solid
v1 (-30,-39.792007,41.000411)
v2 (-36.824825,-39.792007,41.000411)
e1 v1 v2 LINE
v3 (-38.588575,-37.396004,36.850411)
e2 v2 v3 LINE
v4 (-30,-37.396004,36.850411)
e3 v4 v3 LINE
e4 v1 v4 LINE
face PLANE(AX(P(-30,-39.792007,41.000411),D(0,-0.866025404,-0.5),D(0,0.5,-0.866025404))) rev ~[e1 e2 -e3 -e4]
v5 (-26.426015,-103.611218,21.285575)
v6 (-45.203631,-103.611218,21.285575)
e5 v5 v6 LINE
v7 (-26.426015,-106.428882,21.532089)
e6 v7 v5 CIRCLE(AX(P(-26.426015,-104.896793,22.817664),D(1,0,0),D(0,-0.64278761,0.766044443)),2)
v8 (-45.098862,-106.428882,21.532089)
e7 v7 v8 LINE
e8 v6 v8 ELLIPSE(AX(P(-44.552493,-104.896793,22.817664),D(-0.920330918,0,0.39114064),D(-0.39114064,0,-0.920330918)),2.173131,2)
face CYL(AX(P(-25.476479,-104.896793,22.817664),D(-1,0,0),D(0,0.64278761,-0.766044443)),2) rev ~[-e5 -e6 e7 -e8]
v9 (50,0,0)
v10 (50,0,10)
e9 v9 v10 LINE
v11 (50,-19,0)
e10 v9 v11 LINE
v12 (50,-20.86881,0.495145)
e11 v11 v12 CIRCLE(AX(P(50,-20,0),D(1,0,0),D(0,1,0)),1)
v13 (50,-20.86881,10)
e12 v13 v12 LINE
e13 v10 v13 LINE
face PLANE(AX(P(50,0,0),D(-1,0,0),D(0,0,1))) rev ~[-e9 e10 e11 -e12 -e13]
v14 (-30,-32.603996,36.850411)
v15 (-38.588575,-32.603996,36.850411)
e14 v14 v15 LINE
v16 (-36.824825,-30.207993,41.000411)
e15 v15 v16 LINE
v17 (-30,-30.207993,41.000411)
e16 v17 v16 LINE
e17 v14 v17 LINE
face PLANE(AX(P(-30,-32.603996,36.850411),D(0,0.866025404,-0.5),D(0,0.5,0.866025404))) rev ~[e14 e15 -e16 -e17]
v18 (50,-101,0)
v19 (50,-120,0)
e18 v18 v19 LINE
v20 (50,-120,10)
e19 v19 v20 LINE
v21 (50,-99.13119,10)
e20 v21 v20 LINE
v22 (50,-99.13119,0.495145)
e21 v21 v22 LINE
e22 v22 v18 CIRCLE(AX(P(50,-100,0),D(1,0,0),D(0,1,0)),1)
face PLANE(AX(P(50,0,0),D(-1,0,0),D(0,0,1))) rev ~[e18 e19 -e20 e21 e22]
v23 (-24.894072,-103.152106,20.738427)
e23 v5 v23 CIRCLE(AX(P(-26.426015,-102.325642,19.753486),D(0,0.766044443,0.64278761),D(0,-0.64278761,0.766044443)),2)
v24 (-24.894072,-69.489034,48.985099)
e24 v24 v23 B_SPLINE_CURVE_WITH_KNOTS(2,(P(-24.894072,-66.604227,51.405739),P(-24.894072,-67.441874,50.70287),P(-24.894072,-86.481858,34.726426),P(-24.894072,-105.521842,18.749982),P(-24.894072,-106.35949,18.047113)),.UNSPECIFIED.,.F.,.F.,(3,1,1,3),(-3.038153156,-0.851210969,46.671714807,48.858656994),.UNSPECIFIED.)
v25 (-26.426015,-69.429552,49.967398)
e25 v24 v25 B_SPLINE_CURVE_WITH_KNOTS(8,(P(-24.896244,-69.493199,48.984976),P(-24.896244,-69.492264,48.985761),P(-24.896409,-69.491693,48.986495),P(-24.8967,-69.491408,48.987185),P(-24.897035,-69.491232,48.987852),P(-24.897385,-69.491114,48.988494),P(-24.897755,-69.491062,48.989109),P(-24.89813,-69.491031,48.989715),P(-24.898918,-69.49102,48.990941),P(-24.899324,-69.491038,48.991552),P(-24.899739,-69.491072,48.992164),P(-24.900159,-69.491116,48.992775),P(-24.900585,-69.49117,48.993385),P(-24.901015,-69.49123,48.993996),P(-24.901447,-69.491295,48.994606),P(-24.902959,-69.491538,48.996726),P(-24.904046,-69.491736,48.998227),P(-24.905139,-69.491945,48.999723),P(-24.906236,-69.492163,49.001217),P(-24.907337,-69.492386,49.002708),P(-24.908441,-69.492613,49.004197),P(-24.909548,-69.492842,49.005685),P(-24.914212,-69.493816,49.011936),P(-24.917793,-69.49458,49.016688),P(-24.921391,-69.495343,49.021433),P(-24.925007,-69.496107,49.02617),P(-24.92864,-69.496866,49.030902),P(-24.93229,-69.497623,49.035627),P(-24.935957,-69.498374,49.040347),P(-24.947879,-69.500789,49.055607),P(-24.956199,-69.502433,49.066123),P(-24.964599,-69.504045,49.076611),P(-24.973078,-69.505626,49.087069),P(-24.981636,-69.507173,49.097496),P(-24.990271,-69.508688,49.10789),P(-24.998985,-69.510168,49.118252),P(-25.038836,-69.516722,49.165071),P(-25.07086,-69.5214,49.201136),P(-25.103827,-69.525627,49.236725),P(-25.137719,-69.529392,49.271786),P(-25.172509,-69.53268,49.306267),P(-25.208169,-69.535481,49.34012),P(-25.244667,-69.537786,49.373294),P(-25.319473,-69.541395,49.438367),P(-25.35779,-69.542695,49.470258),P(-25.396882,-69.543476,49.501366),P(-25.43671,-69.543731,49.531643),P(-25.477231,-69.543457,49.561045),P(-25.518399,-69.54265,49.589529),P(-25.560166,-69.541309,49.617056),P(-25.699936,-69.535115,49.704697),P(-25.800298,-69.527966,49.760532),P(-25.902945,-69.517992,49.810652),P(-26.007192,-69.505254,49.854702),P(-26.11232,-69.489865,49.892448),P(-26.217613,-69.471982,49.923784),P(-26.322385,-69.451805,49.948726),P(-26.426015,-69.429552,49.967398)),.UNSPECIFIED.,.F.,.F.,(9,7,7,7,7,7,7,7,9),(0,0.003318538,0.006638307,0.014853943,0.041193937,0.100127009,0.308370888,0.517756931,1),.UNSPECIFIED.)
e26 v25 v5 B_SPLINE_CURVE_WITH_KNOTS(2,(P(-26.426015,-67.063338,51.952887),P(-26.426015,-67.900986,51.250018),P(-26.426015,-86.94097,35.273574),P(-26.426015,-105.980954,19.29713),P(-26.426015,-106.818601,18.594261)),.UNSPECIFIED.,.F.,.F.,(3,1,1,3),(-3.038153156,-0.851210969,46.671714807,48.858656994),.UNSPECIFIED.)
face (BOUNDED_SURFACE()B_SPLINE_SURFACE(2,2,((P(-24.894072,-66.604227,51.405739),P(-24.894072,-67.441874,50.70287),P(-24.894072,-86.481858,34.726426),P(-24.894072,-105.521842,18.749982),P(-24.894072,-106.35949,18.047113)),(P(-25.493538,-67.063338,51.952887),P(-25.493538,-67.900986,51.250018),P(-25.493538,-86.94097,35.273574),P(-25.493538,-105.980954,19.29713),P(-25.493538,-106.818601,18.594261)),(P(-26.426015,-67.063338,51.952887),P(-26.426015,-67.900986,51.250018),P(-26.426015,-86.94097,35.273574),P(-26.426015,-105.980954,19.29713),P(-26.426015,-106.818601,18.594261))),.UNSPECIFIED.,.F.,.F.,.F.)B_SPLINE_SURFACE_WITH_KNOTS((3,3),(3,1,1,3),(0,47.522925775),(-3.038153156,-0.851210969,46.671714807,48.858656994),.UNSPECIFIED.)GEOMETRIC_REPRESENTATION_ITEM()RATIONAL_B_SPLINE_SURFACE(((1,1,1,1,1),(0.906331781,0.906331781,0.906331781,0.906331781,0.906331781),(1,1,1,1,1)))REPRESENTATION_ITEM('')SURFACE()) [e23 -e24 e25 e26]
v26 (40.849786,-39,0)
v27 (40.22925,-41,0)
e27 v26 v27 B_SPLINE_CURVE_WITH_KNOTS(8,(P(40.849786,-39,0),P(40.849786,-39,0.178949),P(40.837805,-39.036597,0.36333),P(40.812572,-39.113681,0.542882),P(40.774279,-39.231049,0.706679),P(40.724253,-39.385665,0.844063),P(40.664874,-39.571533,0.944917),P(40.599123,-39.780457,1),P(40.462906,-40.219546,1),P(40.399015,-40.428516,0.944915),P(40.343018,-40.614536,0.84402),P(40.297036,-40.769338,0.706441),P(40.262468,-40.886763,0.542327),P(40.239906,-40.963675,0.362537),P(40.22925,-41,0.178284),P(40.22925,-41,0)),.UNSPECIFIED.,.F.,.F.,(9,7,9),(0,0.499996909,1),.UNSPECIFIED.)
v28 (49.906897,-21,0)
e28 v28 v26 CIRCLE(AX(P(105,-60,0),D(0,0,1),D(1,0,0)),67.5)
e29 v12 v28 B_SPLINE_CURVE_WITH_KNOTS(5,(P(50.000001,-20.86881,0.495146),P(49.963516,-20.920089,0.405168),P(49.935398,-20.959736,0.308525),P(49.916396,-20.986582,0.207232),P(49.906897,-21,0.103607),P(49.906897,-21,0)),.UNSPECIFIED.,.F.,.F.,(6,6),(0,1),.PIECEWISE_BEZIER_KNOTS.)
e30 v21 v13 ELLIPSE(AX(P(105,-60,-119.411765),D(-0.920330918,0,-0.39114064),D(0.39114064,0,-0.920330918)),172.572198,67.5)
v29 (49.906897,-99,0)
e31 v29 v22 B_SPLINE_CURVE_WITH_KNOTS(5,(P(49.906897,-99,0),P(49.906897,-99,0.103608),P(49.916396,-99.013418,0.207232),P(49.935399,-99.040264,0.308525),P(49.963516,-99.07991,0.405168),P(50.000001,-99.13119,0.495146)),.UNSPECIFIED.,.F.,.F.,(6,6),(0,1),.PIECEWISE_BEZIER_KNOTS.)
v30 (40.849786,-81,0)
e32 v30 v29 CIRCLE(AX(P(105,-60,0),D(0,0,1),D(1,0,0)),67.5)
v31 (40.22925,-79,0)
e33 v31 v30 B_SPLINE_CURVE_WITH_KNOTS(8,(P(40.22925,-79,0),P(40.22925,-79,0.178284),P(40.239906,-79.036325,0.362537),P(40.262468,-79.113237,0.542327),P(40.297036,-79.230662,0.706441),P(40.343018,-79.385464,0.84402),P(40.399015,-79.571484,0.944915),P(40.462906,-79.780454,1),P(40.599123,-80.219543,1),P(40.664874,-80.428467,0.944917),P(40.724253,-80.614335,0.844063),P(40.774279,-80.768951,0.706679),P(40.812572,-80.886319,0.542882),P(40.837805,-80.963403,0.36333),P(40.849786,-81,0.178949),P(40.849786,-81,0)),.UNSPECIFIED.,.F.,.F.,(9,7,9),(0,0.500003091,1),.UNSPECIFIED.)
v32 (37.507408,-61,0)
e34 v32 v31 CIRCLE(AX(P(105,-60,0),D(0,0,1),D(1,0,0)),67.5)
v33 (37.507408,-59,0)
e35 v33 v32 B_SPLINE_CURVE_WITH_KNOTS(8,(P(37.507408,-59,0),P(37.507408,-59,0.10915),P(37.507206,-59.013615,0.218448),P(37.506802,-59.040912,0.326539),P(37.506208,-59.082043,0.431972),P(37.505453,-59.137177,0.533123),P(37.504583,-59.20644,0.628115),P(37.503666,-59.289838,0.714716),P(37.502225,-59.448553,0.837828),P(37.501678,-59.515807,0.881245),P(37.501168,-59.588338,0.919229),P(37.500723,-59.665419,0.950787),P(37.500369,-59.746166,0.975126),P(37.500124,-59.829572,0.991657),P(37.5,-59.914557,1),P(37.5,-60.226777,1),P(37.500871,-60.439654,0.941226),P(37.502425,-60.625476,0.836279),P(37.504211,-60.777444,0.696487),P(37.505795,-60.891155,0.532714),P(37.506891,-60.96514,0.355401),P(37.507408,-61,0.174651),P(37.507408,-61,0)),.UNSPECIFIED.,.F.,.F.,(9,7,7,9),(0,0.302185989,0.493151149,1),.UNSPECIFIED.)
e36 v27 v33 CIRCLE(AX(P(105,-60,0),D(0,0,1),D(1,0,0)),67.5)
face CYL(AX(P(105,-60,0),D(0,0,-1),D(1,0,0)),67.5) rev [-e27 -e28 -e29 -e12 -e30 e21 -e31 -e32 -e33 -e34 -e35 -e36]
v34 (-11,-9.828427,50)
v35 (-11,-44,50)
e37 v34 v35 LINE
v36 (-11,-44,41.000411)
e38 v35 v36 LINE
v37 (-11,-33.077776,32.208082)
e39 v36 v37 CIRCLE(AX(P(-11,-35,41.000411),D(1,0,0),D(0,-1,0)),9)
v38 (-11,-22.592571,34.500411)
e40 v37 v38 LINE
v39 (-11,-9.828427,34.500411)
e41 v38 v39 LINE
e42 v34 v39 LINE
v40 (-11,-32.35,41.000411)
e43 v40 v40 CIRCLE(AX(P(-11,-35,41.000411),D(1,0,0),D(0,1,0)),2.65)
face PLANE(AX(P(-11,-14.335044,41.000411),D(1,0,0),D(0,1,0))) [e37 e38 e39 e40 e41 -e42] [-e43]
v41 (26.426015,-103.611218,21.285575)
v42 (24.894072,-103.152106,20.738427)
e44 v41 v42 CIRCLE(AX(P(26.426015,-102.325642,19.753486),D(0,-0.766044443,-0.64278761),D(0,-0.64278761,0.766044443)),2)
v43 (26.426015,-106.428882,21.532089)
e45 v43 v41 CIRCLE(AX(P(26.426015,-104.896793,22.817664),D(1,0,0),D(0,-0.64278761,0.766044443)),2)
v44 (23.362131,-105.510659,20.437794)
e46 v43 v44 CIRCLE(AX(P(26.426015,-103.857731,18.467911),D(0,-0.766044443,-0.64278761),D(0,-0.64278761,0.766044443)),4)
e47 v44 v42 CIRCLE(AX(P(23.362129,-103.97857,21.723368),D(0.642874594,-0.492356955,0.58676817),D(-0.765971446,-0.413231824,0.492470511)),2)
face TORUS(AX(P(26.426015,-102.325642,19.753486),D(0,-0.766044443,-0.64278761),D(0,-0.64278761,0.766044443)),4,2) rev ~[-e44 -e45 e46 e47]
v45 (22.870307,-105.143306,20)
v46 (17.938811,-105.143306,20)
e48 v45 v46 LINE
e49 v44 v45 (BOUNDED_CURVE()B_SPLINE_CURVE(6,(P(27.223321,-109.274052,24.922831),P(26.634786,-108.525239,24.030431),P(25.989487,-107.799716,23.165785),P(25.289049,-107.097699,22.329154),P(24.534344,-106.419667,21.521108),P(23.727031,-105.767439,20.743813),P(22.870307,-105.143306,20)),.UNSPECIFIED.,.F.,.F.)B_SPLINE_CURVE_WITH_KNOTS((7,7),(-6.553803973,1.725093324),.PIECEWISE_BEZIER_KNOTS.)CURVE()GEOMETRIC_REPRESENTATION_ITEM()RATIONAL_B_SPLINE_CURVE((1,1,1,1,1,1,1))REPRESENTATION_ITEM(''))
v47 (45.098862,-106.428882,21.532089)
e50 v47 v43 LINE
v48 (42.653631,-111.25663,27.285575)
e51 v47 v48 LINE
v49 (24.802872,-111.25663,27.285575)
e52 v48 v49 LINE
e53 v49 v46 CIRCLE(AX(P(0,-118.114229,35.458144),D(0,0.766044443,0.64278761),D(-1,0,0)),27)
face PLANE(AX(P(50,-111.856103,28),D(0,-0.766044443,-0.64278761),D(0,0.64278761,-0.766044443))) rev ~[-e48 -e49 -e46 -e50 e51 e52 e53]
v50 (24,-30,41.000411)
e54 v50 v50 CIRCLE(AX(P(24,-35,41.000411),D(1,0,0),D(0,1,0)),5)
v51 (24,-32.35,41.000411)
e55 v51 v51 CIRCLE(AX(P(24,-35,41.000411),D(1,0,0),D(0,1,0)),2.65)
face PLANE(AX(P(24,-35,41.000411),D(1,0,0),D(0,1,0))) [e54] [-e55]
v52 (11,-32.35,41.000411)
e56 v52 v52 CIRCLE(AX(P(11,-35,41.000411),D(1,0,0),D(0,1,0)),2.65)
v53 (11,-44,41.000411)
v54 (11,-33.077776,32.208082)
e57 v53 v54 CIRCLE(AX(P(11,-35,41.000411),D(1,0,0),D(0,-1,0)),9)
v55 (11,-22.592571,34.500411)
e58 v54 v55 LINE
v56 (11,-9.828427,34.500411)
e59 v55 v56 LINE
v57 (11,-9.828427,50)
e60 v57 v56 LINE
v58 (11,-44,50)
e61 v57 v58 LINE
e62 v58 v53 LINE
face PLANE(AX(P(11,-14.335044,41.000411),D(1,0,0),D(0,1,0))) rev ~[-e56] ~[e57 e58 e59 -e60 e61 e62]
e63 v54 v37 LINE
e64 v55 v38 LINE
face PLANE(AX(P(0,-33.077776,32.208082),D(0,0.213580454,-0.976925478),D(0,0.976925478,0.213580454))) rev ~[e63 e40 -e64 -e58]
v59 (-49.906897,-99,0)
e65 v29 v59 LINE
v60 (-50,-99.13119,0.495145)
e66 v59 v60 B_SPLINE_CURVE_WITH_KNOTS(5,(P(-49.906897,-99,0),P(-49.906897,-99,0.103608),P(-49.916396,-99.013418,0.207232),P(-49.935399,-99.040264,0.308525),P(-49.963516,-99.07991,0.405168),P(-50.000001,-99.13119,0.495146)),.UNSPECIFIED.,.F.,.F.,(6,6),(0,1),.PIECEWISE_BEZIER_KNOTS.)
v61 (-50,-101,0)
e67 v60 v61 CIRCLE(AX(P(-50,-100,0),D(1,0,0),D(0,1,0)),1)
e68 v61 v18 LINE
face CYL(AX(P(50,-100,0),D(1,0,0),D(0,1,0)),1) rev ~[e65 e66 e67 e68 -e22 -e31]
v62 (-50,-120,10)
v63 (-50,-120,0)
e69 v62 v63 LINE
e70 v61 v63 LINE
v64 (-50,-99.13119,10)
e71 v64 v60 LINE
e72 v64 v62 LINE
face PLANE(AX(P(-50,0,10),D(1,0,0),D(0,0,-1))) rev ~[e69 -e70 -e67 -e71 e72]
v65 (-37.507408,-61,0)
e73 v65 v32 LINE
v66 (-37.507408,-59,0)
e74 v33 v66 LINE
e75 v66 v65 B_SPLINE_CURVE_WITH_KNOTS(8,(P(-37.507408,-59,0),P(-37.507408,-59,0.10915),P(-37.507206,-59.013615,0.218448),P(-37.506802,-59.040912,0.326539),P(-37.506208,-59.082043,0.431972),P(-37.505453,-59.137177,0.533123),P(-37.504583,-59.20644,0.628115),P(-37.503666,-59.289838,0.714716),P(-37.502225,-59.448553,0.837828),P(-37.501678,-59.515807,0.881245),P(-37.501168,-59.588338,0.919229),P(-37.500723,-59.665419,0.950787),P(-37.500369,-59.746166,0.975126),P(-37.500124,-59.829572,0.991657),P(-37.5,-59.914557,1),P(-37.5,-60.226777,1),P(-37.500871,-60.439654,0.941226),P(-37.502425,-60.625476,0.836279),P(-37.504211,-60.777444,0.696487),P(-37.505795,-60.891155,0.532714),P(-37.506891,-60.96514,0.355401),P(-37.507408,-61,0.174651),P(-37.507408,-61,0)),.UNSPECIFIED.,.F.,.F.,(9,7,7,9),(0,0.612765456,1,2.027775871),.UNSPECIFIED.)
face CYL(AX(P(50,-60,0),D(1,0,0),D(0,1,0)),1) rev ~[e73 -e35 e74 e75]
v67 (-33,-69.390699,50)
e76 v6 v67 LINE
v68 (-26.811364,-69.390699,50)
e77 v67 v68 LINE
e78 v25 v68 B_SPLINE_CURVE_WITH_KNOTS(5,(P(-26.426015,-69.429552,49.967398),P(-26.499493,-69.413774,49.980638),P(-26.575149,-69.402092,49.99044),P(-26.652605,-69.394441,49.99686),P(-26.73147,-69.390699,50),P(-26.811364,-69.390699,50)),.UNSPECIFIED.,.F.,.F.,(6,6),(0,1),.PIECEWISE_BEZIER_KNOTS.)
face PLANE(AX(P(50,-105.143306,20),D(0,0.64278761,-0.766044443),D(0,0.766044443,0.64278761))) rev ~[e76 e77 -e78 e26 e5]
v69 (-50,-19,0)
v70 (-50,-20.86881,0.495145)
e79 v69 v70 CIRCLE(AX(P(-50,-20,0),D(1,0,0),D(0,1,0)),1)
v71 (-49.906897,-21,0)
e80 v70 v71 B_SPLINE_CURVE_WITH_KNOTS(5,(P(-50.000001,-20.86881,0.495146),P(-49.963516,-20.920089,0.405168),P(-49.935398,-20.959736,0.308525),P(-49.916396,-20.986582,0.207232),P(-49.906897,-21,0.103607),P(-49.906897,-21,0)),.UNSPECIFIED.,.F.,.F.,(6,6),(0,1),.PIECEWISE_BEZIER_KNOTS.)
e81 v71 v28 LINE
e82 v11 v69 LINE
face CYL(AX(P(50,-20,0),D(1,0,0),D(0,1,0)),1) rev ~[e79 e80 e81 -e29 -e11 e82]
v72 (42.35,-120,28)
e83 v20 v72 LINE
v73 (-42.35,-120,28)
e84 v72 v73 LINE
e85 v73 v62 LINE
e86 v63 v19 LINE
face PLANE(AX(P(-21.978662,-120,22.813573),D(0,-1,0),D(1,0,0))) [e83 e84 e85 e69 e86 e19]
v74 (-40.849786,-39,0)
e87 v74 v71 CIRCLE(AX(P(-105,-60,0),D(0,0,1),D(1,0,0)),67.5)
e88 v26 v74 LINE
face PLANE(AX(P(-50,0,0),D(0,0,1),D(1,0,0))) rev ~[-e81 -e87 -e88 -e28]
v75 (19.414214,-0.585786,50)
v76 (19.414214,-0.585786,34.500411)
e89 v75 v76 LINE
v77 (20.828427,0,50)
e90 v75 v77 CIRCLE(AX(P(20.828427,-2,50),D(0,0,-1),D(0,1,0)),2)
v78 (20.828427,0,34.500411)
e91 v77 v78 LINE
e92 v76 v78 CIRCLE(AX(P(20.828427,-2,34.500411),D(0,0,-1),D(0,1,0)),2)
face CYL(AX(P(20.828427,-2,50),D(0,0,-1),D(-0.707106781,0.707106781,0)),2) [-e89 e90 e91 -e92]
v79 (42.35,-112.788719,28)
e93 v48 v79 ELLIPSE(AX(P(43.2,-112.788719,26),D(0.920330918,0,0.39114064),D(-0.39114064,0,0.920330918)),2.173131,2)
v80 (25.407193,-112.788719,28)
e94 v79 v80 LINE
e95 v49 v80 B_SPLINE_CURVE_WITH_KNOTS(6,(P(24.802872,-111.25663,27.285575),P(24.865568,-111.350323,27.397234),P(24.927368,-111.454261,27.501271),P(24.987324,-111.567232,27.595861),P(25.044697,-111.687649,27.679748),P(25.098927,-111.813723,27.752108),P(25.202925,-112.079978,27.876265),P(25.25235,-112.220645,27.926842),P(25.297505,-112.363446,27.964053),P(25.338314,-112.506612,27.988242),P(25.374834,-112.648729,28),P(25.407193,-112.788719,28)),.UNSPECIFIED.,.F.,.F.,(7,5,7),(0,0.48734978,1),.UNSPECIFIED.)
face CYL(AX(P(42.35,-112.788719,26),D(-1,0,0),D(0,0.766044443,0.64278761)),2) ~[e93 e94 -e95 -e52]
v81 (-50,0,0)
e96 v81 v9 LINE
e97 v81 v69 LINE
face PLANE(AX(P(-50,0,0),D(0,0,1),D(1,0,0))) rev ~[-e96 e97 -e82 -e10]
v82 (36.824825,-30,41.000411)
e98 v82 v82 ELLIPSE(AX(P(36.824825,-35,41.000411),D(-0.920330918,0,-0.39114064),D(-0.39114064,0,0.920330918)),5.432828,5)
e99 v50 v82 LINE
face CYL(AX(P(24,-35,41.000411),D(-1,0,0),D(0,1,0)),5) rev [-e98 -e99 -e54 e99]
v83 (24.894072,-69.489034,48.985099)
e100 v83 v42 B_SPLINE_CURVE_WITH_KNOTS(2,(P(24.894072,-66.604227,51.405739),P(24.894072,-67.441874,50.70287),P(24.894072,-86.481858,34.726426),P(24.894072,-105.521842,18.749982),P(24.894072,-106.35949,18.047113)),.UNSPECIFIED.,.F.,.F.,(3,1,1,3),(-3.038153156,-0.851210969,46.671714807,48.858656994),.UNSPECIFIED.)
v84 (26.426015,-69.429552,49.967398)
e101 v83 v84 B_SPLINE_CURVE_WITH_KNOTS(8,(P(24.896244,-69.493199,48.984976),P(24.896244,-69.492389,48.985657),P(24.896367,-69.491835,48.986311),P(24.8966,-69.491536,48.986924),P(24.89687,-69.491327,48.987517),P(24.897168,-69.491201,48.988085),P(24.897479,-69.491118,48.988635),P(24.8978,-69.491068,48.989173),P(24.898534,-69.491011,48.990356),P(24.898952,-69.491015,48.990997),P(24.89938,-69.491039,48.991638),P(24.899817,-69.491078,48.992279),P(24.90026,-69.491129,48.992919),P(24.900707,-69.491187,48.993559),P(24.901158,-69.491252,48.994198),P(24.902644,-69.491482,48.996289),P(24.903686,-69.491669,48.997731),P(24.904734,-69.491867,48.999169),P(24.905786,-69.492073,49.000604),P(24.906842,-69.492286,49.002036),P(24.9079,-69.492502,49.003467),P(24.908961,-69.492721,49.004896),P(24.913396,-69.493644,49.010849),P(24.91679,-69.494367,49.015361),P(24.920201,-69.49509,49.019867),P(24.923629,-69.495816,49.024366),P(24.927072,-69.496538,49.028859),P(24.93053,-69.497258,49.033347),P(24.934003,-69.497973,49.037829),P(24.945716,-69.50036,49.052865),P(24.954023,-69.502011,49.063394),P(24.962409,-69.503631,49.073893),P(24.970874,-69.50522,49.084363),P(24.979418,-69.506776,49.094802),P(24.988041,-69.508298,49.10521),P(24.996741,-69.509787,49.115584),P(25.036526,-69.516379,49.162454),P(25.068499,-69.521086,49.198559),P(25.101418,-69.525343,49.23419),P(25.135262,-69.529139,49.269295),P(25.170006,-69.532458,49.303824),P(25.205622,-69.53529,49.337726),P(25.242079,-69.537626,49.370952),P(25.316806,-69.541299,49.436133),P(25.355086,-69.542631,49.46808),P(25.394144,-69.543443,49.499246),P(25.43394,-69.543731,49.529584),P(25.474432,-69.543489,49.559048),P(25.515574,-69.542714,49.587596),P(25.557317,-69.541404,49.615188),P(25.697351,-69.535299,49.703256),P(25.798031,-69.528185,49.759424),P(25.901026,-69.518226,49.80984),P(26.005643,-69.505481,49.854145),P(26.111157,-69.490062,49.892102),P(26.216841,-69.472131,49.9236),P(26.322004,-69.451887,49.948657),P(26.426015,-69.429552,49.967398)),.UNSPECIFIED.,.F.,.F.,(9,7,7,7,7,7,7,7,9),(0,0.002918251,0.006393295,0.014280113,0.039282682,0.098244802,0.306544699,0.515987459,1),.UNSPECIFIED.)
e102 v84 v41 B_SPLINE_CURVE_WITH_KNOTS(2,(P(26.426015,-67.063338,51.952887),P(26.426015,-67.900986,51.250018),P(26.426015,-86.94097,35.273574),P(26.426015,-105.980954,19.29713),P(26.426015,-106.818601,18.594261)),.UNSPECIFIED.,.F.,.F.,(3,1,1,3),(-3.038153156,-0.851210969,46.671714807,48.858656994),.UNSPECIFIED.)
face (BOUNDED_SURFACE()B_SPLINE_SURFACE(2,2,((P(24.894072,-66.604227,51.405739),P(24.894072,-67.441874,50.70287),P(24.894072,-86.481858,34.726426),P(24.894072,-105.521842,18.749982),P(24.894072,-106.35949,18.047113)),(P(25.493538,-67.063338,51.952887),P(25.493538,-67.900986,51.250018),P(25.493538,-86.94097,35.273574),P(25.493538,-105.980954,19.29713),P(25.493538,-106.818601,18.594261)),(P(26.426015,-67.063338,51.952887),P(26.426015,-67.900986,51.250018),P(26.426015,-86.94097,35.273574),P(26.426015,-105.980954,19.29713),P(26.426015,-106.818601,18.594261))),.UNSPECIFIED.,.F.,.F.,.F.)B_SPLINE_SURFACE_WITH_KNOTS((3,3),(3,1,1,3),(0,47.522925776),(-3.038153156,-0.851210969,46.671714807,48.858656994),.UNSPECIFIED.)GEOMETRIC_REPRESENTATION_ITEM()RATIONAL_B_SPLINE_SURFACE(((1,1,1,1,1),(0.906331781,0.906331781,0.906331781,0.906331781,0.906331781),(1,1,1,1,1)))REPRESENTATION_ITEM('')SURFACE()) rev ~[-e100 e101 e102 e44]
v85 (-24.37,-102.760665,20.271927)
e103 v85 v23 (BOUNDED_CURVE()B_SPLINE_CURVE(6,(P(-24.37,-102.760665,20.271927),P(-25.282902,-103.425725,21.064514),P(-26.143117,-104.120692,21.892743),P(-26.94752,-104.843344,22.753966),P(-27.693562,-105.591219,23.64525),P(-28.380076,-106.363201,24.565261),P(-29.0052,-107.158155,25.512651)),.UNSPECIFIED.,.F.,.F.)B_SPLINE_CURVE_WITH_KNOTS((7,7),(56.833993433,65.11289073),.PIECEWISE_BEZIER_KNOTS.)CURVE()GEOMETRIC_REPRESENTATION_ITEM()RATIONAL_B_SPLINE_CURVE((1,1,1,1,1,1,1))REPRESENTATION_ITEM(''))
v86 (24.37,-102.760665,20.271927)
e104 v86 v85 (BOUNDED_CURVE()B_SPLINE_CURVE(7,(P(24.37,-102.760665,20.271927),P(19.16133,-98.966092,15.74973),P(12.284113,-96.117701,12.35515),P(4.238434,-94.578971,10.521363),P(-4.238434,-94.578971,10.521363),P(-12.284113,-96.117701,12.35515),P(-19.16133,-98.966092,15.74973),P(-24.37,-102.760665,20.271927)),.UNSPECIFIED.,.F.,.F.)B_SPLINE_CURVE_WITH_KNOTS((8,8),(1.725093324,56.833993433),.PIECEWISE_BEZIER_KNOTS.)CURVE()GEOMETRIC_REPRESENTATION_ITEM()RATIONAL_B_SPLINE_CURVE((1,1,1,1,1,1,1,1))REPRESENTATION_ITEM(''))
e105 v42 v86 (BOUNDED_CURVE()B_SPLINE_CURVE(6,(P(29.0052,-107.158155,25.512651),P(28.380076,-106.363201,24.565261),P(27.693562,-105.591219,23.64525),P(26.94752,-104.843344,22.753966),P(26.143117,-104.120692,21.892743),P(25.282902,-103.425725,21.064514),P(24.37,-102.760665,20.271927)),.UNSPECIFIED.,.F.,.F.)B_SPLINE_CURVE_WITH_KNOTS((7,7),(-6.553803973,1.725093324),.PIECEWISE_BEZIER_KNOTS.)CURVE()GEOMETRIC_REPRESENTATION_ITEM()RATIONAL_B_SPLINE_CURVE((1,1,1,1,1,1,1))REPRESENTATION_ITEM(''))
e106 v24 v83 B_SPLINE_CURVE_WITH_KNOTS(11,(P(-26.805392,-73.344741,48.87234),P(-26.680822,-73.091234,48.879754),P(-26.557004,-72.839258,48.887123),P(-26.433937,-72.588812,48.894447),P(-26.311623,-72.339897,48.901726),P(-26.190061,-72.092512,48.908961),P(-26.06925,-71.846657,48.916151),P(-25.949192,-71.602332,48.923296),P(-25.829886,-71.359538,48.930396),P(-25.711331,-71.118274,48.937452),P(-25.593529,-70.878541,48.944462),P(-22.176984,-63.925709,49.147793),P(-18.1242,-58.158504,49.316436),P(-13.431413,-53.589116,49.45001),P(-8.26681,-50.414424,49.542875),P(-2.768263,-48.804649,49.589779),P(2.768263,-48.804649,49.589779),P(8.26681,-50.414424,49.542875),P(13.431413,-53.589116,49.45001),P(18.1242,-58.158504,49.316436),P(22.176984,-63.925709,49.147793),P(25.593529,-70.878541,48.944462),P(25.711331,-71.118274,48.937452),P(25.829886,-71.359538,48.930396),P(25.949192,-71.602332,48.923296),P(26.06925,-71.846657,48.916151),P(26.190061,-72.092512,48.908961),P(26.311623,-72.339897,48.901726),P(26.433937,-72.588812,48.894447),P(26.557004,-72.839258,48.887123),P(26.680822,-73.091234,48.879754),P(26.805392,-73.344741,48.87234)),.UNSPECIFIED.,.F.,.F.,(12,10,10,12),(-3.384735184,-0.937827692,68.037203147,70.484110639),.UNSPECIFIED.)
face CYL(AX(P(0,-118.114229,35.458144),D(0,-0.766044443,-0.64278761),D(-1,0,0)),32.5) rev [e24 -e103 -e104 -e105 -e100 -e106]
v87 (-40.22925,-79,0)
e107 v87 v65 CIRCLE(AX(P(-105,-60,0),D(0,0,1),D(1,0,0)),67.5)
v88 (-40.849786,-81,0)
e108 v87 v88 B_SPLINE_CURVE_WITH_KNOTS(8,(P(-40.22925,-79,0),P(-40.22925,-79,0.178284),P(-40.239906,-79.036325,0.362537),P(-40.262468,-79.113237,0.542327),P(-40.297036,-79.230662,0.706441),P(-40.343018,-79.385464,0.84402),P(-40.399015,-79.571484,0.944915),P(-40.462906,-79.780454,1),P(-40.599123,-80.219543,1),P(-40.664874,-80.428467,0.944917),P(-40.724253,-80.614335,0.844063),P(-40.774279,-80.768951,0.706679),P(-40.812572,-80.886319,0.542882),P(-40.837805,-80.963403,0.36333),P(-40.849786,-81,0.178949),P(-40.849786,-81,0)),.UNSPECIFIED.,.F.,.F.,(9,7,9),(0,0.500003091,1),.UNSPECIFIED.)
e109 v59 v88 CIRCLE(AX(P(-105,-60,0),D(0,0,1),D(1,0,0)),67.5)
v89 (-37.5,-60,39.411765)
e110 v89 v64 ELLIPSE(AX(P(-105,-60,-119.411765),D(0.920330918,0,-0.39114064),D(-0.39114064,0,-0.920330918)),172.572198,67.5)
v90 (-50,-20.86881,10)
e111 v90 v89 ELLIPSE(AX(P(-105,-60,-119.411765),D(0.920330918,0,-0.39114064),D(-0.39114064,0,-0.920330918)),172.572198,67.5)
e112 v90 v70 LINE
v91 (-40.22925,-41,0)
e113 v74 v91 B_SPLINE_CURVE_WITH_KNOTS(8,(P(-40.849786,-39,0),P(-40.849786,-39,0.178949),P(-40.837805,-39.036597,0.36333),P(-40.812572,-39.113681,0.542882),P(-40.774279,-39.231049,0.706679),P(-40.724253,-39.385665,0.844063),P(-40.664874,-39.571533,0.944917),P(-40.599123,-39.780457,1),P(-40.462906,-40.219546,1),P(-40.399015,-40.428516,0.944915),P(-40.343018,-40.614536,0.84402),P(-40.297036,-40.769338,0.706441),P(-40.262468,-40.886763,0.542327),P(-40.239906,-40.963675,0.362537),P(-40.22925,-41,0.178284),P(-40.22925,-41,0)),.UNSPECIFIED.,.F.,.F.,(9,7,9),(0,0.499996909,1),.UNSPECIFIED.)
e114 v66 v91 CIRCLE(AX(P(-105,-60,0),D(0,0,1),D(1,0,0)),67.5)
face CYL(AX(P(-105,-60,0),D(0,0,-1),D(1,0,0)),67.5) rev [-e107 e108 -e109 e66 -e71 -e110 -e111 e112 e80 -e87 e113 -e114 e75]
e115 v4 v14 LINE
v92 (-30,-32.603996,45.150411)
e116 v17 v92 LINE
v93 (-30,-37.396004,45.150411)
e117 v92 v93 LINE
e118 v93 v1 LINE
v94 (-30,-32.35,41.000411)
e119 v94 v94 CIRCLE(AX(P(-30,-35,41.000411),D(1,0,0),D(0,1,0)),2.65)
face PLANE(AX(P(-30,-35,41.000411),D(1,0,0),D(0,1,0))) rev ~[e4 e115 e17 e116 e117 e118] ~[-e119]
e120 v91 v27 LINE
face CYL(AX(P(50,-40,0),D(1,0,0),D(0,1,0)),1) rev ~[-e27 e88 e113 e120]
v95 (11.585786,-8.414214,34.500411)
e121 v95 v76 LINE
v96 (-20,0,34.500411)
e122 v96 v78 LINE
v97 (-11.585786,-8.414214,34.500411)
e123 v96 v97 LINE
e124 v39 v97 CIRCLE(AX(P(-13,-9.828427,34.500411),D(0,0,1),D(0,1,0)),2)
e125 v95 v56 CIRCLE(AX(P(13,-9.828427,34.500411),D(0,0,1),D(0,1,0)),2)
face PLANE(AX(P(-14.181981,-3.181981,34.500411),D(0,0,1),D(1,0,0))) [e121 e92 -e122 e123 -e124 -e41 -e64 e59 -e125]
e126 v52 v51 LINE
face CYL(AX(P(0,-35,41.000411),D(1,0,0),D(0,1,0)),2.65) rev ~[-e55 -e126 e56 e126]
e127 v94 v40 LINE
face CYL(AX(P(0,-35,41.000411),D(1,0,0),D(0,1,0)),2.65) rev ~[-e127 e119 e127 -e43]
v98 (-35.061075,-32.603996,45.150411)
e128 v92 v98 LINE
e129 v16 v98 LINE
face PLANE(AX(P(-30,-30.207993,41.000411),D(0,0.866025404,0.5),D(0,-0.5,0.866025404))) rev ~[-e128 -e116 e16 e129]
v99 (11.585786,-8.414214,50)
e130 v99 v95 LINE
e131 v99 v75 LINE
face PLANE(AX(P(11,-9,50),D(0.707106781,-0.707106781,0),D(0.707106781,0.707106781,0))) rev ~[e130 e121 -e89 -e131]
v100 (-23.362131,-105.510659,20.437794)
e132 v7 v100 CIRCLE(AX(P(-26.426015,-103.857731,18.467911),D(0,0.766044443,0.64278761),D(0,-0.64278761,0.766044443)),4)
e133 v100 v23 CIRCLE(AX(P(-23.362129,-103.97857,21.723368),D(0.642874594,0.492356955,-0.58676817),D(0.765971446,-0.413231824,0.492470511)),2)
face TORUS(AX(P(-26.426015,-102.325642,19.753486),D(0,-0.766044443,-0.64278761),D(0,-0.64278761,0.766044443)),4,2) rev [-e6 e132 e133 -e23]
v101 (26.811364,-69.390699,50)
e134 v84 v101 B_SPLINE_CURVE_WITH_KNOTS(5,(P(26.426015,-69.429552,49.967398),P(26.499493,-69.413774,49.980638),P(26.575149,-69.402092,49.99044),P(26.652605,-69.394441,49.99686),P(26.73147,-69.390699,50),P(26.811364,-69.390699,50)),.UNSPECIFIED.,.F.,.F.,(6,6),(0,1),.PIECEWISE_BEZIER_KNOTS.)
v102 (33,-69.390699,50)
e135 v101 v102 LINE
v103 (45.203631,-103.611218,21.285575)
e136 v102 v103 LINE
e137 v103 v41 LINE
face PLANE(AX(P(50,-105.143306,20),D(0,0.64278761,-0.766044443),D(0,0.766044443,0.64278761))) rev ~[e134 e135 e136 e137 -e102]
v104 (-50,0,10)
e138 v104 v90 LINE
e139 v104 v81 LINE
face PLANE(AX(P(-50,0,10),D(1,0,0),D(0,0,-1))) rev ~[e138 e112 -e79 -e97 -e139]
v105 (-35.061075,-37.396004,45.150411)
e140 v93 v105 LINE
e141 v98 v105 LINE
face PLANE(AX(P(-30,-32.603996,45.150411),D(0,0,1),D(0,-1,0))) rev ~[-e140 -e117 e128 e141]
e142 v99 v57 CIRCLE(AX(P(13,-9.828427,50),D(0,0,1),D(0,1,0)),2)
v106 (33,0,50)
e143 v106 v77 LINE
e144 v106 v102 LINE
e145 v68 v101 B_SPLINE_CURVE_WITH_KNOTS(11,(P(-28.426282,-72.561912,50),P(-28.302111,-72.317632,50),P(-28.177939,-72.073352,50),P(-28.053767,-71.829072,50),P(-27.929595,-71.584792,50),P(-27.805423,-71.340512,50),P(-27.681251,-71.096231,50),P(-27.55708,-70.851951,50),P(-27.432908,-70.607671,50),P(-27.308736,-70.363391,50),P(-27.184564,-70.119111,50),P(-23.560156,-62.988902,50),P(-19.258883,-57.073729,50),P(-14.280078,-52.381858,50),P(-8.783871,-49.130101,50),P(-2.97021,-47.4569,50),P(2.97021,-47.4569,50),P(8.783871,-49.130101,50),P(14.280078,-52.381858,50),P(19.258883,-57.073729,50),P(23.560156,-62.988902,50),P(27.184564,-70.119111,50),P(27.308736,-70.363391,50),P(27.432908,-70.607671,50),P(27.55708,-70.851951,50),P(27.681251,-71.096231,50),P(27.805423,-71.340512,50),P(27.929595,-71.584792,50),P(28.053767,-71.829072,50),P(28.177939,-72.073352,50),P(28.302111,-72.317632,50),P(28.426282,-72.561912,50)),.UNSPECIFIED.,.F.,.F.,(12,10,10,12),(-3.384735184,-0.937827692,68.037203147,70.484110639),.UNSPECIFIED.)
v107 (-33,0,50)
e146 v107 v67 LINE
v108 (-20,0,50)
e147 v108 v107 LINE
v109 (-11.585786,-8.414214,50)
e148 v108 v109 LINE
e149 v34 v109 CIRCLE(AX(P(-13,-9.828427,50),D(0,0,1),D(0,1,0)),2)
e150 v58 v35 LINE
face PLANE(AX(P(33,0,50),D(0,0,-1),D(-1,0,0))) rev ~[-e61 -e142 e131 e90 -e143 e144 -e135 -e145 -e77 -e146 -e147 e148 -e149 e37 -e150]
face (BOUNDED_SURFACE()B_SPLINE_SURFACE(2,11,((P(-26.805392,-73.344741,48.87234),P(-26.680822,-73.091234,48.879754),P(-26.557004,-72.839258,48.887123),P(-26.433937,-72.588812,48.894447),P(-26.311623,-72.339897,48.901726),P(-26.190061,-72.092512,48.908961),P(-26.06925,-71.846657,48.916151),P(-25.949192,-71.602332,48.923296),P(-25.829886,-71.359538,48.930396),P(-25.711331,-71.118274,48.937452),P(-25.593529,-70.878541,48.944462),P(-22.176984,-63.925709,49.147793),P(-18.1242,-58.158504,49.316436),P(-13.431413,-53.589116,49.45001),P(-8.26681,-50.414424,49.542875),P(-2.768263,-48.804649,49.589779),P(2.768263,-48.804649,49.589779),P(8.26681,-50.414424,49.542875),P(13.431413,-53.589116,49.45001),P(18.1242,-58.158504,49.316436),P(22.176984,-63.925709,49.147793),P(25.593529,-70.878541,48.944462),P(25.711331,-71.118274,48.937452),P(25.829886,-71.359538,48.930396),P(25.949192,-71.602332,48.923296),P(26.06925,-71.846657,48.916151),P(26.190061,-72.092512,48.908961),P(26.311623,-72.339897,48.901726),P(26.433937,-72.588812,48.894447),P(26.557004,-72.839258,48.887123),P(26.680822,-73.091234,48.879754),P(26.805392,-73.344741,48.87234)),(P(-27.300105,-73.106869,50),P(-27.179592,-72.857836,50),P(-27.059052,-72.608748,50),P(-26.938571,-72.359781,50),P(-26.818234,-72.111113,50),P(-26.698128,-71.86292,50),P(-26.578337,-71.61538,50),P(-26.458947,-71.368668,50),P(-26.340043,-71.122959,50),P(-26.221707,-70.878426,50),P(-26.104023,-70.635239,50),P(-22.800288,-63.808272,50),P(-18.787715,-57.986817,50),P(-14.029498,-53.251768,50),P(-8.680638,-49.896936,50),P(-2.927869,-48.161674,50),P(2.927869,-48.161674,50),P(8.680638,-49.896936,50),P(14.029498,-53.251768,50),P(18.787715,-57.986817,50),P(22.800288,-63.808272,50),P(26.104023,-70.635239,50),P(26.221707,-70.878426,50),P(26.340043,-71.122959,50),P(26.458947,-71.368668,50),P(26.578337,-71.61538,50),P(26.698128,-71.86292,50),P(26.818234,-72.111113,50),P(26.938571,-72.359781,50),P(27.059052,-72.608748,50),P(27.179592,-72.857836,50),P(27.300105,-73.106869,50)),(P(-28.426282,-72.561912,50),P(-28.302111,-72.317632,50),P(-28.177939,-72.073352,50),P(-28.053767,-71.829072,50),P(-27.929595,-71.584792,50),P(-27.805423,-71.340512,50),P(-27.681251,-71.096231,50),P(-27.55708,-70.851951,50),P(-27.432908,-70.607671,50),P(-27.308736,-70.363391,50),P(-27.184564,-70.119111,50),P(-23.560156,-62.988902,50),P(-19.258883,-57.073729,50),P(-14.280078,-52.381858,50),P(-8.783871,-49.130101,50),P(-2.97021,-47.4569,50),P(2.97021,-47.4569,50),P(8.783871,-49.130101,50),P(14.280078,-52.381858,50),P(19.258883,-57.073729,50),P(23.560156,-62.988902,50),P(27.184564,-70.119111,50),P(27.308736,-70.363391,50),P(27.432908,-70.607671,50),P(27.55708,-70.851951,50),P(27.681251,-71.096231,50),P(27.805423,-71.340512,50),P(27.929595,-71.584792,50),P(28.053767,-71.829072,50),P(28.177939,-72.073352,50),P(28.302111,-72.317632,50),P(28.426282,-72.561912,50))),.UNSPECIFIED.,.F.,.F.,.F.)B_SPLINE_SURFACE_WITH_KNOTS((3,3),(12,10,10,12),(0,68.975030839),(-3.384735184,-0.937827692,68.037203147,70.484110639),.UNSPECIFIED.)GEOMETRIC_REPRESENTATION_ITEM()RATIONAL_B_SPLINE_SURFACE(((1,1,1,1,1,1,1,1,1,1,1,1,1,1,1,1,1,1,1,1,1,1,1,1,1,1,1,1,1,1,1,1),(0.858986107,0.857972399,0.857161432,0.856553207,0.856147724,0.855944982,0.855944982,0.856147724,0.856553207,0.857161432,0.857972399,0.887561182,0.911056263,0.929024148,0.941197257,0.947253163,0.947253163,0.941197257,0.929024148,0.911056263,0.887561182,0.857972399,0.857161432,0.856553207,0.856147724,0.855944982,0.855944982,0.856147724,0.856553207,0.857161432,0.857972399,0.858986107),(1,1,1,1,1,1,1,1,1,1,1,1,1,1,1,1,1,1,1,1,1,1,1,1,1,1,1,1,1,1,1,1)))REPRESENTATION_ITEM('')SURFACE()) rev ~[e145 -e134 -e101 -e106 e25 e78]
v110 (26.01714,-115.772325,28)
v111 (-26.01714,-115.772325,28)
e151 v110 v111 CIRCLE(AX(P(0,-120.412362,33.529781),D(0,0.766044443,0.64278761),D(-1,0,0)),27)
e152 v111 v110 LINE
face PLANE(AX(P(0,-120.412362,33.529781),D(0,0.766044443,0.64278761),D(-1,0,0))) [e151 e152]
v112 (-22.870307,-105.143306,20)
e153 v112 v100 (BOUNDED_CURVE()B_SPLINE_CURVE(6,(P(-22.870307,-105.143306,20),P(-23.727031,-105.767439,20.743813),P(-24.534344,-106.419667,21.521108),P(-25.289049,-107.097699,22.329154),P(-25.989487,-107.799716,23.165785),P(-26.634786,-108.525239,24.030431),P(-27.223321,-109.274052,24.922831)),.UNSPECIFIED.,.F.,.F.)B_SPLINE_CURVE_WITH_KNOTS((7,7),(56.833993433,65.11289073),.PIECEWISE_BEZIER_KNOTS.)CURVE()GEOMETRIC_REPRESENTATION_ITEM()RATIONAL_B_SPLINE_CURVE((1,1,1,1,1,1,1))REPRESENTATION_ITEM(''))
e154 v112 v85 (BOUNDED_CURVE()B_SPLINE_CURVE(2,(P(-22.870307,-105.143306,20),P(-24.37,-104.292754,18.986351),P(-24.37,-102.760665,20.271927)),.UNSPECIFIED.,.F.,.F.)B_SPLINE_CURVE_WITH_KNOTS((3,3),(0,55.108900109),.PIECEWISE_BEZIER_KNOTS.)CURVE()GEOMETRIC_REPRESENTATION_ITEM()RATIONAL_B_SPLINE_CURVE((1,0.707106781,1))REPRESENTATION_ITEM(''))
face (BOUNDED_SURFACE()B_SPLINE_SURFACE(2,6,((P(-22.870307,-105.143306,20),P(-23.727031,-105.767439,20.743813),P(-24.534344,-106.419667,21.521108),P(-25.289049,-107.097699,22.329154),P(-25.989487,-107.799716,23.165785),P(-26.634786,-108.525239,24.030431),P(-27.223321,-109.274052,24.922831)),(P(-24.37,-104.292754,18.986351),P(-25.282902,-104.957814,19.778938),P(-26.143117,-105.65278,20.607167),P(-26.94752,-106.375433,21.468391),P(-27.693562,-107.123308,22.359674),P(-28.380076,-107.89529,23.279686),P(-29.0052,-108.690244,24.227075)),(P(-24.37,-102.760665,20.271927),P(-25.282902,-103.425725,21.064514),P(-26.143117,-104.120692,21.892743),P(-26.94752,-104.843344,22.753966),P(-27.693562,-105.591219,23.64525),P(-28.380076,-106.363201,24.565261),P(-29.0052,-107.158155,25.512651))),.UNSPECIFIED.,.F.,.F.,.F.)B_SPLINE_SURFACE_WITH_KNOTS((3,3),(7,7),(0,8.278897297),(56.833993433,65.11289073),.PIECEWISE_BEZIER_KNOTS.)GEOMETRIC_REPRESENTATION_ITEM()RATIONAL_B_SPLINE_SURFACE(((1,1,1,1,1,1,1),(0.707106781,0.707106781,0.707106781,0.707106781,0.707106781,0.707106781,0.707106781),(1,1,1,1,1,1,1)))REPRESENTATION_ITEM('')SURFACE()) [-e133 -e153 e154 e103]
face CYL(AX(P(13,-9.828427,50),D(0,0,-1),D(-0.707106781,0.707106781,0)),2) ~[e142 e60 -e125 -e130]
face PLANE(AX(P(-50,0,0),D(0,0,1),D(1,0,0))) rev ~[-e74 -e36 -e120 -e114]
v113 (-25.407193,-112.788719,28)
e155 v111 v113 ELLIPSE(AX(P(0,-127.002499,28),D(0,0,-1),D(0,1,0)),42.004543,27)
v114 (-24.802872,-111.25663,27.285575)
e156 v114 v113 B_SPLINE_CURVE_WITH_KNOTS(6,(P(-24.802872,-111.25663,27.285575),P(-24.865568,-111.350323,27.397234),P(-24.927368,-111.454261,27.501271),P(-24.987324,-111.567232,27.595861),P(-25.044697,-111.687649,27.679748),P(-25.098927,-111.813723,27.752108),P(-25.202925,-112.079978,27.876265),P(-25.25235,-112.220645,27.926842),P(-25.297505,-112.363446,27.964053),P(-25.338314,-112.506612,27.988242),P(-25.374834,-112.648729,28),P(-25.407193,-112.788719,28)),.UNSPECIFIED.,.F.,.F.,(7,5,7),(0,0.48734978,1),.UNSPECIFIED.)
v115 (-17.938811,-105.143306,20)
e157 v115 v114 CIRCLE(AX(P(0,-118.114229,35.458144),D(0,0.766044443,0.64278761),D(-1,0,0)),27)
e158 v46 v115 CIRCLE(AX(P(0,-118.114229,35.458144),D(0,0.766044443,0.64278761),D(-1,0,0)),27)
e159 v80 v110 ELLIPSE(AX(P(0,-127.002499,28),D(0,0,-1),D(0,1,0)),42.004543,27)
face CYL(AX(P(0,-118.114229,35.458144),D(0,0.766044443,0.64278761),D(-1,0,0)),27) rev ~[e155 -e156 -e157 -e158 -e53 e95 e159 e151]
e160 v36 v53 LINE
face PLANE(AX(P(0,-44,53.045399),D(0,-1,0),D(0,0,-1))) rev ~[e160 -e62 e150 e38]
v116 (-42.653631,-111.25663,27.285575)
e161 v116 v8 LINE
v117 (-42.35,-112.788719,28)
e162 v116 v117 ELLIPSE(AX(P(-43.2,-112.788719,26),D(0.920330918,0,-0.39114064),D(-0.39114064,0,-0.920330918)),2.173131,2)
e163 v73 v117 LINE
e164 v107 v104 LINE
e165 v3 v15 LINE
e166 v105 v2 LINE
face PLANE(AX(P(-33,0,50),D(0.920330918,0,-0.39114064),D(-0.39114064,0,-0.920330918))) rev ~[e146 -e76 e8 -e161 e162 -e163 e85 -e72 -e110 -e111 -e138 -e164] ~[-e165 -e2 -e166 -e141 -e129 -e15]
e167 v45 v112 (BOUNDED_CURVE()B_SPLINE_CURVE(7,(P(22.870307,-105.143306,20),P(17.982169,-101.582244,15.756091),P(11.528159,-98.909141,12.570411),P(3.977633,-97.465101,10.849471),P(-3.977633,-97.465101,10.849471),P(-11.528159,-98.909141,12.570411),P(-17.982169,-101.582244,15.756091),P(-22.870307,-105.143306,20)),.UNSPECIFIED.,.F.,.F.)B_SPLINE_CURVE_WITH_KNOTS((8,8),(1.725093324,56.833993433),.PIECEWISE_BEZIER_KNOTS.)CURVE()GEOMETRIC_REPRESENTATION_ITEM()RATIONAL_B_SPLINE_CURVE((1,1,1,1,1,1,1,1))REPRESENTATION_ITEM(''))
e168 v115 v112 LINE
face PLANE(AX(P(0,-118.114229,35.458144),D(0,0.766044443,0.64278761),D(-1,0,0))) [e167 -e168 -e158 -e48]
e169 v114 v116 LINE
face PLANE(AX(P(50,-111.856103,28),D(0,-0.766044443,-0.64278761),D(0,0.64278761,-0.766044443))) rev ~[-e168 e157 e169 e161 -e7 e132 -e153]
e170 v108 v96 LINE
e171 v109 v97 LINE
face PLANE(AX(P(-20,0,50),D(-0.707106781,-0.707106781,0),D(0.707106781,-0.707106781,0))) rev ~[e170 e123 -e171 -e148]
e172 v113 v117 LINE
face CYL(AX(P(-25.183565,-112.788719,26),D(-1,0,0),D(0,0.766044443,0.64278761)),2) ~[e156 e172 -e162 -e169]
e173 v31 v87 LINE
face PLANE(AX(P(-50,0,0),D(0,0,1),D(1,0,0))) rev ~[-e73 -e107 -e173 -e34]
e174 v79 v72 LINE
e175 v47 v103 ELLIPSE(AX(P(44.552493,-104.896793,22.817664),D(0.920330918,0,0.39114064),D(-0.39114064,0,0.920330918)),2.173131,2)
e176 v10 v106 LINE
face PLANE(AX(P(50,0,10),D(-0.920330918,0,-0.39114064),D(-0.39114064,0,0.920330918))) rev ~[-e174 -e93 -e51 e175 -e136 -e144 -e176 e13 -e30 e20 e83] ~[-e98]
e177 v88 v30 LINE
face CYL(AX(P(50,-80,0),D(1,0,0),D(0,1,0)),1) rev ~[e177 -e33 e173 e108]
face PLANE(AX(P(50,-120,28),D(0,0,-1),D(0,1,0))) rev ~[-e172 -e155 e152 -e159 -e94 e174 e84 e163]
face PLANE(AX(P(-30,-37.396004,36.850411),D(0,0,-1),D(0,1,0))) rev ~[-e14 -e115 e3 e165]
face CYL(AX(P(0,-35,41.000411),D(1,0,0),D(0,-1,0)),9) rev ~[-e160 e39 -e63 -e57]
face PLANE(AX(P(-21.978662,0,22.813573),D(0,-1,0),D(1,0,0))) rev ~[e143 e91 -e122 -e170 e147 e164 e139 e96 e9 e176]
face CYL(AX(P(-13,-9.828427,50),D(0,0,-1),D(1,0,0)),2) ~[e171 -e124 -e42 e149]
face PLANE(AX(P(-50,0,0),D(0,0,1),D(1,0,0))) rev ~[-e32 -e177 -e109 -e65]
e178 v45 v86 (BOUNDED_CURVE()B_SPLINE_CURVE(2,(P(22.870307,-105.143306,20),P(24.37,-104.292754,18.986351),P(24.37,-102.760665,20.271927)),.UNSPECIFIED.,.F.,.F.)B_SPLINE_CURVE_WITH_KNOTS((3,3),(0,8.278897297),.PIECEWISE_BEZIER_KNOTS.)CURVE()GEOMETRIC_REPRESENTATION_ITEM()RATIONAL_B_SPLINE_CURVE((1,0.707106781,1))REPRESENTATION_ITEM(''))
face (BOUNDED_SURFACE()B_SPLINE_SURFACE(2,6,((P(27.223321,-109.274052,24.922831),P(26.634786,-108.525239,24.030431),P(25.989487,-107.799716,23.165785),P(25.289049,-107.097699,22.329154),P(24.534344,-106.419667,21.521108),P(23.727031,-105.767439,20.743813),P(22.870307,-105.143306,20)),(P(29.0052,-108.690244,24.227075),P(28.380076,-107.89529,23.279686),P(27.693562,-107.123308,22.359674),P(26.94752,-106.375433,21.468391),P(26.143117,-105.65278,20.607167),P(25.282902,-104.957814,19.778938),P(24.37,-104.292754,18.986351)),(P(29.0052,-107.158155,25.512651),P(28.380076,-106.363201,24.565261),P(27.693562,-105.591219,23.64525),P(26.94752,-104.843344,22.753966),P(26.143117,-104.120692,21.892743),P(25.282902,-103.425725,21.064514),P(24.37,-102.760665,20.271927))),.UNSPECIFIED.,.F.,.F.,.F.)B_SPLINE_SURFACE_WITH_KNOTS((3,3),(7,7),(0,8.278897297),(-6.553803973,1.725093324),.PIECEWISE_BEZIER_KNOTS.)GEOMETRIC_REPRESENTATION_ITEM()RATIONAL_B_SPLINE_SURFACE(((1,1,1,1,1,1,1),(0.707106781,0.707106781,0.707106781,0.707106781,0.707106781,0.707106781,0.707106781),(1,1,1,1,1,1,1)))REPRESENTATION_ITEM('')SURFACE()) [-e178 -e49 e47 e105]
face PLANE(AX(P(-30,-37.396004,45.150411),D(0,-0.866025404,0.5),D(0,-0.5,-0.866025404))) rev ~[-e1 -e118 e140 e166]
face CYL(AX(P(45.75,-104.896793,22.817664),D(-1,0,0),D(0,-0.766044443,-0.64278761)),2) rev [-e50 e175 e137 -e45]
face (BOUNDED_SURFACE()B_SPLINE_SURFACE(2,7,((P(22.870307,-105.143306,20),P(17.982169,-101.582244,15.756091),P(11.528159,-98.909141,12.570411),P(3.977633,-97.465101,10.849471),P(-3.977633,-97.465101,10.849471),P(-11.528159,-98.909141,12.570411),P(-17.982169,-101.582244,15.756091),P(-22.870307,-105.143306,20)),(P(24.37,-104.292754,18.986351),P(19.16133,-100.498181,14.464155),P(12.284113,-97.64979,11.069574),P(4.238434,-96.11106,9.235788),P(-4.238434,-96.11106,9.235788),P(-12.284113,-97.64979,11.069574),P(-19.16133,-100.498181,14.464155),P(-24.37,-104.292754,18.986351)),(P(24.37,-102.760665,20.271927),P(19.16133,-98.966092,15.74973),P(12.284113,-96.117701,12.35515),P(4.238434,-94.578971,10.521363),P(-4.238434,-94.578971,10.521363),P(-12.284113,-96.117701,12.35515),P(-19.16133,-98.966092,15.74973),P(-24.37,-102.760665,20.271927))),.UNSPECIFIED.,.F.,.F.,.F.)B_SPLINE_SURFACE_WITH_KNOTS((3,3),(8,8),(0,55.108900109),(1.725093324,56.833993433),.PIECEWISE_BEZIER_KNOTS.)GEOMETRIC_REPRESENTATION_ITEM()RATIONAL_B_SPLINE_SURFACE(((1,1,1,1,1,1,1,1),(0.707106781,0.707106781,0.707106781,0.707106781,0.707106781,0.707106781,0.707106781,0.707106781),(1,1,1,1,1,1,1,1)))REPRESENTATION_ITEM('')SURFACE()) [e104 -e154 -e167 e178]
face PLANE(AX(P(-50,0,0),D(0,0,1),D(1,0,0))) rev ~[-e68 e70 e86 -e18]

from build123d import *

# Parameters (mm, degrees)
F1_DEPTH  = 120
F2_R      = 2.65
F3_DEPTH  = 50
F4_DEPTH  = 11
F6_R      = 5
F6_R_2    = 2.65
F7_DEPTH  = 25
F10_DEPTH = 25
F11_W     = 11
F11_H     = 9
F12_DEPTH = 15.4995888315
F14_DEPTH = 100.001
F15_R     = 32.5
F16_DEPTH = 100
F17_R     = 27
F18_DEPTH = 3
F19_R     = 1
F20_DEPTH = 100.001
F21_R     = 67.5
F22_DEPTH = 50.001
F23_R     = 2


with BuildPart() as f1:
    # F0 (on Front) → F1 (new body)
    with BuildSketch(Plane.XZ):
        Polygon((-50, 0), (0, 0), (0, 50), (-33, 50), (-50, 10), align=None)
        Polygon((0, 50), (0, 0), (50, 0), (50, 10), (33, 50), align=None)
    extrude(amount=F1_DEPTH)

    # F2 (on Right) → F3 (cut, symmetric)
    with BuildSketch(Plane.YZ):
        with Locations((-35, 41.0004111685)):
            Circle(F2_R)
    extrude(amount=F3_DEPTH, both=True, mode=Mode.SUBTRACT)

    # F2 (on Right) → F4 (cut, symmetric)
    with BuildSketch(Plane.YZ):
        with BuildLine():
            Line((-22.5925706327, 34.5004111685), (0, 34.5004111685))
            Line((0, 34.5004111685), (0, 47.5004111685))
            Line((0, 47.5004111685), (-28.775050201, 47.5004111685))
            ThreePointArc((-28.775050201, 47.5004111685), (-26.7227858494, 44.5342088289), (-26, 41.0004111685))
            ThreePointArc((-26, 41.0004111685), (-26.7227858494, 37.4666135082), (-28.775050201, 34.5004111685))
            Line((-28.775050201, 34.5004111685), (-22.5925706327, 34.5004111685))
        make_face()
        with BuildLine():
            Line((-33.0777759178, 32.2080818652), (-22.5925706327, 34.5004111685))
            Line((-22.5925706327, 34.5004111685), (-28.775050201, 34.5004111685))
            ThreePointArc((-28.775050201, 34.5004111685), (-30.7682386679, 33.0573515547), (-33.0777759178, 32.2080818652))
        make_face()
        with BuildLine():
            Line((-28.775050201, 47.5004111685), (0, 47.5004111685))
            Line((0, 47.5004111685), (0, 56.6271956305))
            Line((0, 56.6271956305), (-27.1273270008, 51.5032727532))
            Line((-27.1273270008, 51.5032727532), (-35.0860282779, 50))
            ThreePointArc((-35.0860282779, 50), (-31.6858522299, 49.3679929314), (-28.775050201, 47.5004111685))
        make_face()
        with BuildLine():
            ThreePointArc((-33.0777759178, 32.2080818652), (-30.7682386679, 33.0573515547), (-28.775050201, 34.5004111685))
            ThreePointArc((-28.775050201, 34.5004111685), (-26.7227858494, 37.4666135082), (-26, 41.0004111685))
            ThreePointArc((-26, 41.0004111685), (-26.7227858494, 44.5342088289), (-28.775050201, 47.5004111685))
            ThreePointArc((-28.775050201, 47.5004111685), (-31.6858522299, 49.3679929314), (-35.0860282779, 50))
            ThreePointArc((-35.0860282779, 50), (-41.394304282, 47.3338835771), (-44, 41.0004111685))
            ThreePointArc((-44, 41.0004111685), (-40.6435796823, 33.9897044731), (-33.0777759178, 32.2080818652))
        make_face()
        with Locations((-35, 41.0004111685)):
            Circle(F2_R, mode=Mode.SUBTRACT)
        with BuildLine():
            Line((-44, 53.045399487), (-44, 41.0004111685))
            ThreePointArc((-44, 41.0004111685), (-41.394304282, 47.3338835771), (-35.0860282779, 50))
            Line((-35.0860282779, 50), (-27.1273270008, 51.5032727532))
            Line((-27.1273270008, 51.5032727532), (-44, 53.045399487))
        make_face()
    extrude(amount=F4_DEPTH, both=True, mode=Mode.SUBTRACT)

    # F6 (on offset) → F7 (cut)
    with BuildSketch(Plane.YZ.offset(24)):
        with Locations((-35, 41.0004111685)):
            Circle(F6_R)
        with Locations((-35, 41.0004111685)):
            Circle(F6_R_2, mode=Mode.SUBTRACT)
    extrude(amount=F7_DEPTH, mode=Mode.SUBTRACT)

    # F9 (on offset) → F10 (cut)
    with BuildSketch(Plane.YZ.offset(-30)):
        Polygon((-39.7920072343, 41.0004111685), (-37.3960036171, 36.8504111685), (-32.6039963829, 36.8504111685), (-30.2079927657, 41.0004111685), (-32.6039963829, 45.1504111685), (-37.3960036171, 45.1504111685), align=None)
    extrude(amount=-F10_DEPTH, mode=Mode.SUBTRACT)

    # F11 (on face) → F12 (cut, through all)
    with BuildSketch(Plane.XY.offset(50)):
        Polygon((-20, 0), (-11, -9), (-11, 0), align=None)
        Polygon((11, 0), (11, -9), (20, 0), align=None)
        with Locations((-5.5, -4.5)):
            Rectangle(F11_W, F11_H)
        with Locations((5.5, -4.5)):
            Rectangle(F11_W, F11_H)
    extrude(amount=-F12_DEPTH, mode=Mode.SUBTRACT)

    # F13 (on face) → F14 (cut, through all)
    with BuildSketch(Plane.YZ.offset(50)):
        Polygon((-105.143306435, 20), (-33.7286775579, 79.9239887514), (-151.3096454964, 75.0189004333), (-120, 37.7055179301), (-111.8561034844, 28), align=None)
        Polygon((-120, 28), (-111.8561034844, 28), (-120, 37.7055179301), align=None)
    extrude(amount=-F14_DEPTH, mode=Mode.SUBTRACT)

    # F15 (on face) → F16 (cut)
    with BuildSketch(Plane(origin=(0, -51.8525474655, -43.5094534539), x_dir=(-1, 0, 0), z_dir=(0, 0.7660444431, 0.6427876097))):
        with Locations((0, 103.0848769822)):
            Circle(F15_R)
    extrude(amount=F16_DEPTH, mode=Mode.SUBTRACT)

    # F17 (on face) → F18 (cut)
    with BuildSketch(Plane(origin=(0, -51.8525474655, -43.5094534539), x_dir=(-1, 0, 0), z_dir=(0, 0.7660444431, 0.6427876097))):
        with Locations((0, 103.0848769822)):
            Circle(F17_R)
    extrude(amount=-F18_DEPTH, mode=Mode.SUBTRACT)

    # F19 (on face) → F20 (cut, through all)
    with BuildSketch(Plane.YZ.offset(50)):
        with Locations((-20, 0)):
            Circle(F19_R)
        with Locations((-40, 0)):
            Circle(F19_R)
        with Locations((-60, 0)):
            Circle(F19_R)
        with Locations((-80, 0)):
            Circle(F19_R)
        with Locations((-100, 0)):
            Circle(F19_R)
    extrude(amount=-F20_DEPTH, mode=Mode.SUBTRACT)

    # F21 (on Top) → F22 (cut, through all)
    with BuildSketch(Plane.XY):
        with Locations((105, -60)):
            Circle(F21_R)
        with Locations((-105, -60)):
            Circle(F21_R)
    extrude(amount=F22_DEPTH, mode=Mode.SUBTRACT)

    # F23
    f23_edges = [f1.edges().sort_by_distance(p)[0] for p in [
        (20, 0, 42.250206),
        (11, -9, 42.250206),
        (-11, -9, 42.250206),
        (-25.476479, -87.267003, 35),
        (25.476479, -87.267003, 35),
        (0, -50.222895, 50),
        (-33.766783, -111.856103, 28),
        (33.766783, -111.856103, 28),
        (-35.613239, -105.143306, 20),
        (35.613239, -105.143306, 20),
        (0, -97.223632, 10.561699),
    ]]
    fillet(f23_edges, radius=F23_R)


solid = f1.part
